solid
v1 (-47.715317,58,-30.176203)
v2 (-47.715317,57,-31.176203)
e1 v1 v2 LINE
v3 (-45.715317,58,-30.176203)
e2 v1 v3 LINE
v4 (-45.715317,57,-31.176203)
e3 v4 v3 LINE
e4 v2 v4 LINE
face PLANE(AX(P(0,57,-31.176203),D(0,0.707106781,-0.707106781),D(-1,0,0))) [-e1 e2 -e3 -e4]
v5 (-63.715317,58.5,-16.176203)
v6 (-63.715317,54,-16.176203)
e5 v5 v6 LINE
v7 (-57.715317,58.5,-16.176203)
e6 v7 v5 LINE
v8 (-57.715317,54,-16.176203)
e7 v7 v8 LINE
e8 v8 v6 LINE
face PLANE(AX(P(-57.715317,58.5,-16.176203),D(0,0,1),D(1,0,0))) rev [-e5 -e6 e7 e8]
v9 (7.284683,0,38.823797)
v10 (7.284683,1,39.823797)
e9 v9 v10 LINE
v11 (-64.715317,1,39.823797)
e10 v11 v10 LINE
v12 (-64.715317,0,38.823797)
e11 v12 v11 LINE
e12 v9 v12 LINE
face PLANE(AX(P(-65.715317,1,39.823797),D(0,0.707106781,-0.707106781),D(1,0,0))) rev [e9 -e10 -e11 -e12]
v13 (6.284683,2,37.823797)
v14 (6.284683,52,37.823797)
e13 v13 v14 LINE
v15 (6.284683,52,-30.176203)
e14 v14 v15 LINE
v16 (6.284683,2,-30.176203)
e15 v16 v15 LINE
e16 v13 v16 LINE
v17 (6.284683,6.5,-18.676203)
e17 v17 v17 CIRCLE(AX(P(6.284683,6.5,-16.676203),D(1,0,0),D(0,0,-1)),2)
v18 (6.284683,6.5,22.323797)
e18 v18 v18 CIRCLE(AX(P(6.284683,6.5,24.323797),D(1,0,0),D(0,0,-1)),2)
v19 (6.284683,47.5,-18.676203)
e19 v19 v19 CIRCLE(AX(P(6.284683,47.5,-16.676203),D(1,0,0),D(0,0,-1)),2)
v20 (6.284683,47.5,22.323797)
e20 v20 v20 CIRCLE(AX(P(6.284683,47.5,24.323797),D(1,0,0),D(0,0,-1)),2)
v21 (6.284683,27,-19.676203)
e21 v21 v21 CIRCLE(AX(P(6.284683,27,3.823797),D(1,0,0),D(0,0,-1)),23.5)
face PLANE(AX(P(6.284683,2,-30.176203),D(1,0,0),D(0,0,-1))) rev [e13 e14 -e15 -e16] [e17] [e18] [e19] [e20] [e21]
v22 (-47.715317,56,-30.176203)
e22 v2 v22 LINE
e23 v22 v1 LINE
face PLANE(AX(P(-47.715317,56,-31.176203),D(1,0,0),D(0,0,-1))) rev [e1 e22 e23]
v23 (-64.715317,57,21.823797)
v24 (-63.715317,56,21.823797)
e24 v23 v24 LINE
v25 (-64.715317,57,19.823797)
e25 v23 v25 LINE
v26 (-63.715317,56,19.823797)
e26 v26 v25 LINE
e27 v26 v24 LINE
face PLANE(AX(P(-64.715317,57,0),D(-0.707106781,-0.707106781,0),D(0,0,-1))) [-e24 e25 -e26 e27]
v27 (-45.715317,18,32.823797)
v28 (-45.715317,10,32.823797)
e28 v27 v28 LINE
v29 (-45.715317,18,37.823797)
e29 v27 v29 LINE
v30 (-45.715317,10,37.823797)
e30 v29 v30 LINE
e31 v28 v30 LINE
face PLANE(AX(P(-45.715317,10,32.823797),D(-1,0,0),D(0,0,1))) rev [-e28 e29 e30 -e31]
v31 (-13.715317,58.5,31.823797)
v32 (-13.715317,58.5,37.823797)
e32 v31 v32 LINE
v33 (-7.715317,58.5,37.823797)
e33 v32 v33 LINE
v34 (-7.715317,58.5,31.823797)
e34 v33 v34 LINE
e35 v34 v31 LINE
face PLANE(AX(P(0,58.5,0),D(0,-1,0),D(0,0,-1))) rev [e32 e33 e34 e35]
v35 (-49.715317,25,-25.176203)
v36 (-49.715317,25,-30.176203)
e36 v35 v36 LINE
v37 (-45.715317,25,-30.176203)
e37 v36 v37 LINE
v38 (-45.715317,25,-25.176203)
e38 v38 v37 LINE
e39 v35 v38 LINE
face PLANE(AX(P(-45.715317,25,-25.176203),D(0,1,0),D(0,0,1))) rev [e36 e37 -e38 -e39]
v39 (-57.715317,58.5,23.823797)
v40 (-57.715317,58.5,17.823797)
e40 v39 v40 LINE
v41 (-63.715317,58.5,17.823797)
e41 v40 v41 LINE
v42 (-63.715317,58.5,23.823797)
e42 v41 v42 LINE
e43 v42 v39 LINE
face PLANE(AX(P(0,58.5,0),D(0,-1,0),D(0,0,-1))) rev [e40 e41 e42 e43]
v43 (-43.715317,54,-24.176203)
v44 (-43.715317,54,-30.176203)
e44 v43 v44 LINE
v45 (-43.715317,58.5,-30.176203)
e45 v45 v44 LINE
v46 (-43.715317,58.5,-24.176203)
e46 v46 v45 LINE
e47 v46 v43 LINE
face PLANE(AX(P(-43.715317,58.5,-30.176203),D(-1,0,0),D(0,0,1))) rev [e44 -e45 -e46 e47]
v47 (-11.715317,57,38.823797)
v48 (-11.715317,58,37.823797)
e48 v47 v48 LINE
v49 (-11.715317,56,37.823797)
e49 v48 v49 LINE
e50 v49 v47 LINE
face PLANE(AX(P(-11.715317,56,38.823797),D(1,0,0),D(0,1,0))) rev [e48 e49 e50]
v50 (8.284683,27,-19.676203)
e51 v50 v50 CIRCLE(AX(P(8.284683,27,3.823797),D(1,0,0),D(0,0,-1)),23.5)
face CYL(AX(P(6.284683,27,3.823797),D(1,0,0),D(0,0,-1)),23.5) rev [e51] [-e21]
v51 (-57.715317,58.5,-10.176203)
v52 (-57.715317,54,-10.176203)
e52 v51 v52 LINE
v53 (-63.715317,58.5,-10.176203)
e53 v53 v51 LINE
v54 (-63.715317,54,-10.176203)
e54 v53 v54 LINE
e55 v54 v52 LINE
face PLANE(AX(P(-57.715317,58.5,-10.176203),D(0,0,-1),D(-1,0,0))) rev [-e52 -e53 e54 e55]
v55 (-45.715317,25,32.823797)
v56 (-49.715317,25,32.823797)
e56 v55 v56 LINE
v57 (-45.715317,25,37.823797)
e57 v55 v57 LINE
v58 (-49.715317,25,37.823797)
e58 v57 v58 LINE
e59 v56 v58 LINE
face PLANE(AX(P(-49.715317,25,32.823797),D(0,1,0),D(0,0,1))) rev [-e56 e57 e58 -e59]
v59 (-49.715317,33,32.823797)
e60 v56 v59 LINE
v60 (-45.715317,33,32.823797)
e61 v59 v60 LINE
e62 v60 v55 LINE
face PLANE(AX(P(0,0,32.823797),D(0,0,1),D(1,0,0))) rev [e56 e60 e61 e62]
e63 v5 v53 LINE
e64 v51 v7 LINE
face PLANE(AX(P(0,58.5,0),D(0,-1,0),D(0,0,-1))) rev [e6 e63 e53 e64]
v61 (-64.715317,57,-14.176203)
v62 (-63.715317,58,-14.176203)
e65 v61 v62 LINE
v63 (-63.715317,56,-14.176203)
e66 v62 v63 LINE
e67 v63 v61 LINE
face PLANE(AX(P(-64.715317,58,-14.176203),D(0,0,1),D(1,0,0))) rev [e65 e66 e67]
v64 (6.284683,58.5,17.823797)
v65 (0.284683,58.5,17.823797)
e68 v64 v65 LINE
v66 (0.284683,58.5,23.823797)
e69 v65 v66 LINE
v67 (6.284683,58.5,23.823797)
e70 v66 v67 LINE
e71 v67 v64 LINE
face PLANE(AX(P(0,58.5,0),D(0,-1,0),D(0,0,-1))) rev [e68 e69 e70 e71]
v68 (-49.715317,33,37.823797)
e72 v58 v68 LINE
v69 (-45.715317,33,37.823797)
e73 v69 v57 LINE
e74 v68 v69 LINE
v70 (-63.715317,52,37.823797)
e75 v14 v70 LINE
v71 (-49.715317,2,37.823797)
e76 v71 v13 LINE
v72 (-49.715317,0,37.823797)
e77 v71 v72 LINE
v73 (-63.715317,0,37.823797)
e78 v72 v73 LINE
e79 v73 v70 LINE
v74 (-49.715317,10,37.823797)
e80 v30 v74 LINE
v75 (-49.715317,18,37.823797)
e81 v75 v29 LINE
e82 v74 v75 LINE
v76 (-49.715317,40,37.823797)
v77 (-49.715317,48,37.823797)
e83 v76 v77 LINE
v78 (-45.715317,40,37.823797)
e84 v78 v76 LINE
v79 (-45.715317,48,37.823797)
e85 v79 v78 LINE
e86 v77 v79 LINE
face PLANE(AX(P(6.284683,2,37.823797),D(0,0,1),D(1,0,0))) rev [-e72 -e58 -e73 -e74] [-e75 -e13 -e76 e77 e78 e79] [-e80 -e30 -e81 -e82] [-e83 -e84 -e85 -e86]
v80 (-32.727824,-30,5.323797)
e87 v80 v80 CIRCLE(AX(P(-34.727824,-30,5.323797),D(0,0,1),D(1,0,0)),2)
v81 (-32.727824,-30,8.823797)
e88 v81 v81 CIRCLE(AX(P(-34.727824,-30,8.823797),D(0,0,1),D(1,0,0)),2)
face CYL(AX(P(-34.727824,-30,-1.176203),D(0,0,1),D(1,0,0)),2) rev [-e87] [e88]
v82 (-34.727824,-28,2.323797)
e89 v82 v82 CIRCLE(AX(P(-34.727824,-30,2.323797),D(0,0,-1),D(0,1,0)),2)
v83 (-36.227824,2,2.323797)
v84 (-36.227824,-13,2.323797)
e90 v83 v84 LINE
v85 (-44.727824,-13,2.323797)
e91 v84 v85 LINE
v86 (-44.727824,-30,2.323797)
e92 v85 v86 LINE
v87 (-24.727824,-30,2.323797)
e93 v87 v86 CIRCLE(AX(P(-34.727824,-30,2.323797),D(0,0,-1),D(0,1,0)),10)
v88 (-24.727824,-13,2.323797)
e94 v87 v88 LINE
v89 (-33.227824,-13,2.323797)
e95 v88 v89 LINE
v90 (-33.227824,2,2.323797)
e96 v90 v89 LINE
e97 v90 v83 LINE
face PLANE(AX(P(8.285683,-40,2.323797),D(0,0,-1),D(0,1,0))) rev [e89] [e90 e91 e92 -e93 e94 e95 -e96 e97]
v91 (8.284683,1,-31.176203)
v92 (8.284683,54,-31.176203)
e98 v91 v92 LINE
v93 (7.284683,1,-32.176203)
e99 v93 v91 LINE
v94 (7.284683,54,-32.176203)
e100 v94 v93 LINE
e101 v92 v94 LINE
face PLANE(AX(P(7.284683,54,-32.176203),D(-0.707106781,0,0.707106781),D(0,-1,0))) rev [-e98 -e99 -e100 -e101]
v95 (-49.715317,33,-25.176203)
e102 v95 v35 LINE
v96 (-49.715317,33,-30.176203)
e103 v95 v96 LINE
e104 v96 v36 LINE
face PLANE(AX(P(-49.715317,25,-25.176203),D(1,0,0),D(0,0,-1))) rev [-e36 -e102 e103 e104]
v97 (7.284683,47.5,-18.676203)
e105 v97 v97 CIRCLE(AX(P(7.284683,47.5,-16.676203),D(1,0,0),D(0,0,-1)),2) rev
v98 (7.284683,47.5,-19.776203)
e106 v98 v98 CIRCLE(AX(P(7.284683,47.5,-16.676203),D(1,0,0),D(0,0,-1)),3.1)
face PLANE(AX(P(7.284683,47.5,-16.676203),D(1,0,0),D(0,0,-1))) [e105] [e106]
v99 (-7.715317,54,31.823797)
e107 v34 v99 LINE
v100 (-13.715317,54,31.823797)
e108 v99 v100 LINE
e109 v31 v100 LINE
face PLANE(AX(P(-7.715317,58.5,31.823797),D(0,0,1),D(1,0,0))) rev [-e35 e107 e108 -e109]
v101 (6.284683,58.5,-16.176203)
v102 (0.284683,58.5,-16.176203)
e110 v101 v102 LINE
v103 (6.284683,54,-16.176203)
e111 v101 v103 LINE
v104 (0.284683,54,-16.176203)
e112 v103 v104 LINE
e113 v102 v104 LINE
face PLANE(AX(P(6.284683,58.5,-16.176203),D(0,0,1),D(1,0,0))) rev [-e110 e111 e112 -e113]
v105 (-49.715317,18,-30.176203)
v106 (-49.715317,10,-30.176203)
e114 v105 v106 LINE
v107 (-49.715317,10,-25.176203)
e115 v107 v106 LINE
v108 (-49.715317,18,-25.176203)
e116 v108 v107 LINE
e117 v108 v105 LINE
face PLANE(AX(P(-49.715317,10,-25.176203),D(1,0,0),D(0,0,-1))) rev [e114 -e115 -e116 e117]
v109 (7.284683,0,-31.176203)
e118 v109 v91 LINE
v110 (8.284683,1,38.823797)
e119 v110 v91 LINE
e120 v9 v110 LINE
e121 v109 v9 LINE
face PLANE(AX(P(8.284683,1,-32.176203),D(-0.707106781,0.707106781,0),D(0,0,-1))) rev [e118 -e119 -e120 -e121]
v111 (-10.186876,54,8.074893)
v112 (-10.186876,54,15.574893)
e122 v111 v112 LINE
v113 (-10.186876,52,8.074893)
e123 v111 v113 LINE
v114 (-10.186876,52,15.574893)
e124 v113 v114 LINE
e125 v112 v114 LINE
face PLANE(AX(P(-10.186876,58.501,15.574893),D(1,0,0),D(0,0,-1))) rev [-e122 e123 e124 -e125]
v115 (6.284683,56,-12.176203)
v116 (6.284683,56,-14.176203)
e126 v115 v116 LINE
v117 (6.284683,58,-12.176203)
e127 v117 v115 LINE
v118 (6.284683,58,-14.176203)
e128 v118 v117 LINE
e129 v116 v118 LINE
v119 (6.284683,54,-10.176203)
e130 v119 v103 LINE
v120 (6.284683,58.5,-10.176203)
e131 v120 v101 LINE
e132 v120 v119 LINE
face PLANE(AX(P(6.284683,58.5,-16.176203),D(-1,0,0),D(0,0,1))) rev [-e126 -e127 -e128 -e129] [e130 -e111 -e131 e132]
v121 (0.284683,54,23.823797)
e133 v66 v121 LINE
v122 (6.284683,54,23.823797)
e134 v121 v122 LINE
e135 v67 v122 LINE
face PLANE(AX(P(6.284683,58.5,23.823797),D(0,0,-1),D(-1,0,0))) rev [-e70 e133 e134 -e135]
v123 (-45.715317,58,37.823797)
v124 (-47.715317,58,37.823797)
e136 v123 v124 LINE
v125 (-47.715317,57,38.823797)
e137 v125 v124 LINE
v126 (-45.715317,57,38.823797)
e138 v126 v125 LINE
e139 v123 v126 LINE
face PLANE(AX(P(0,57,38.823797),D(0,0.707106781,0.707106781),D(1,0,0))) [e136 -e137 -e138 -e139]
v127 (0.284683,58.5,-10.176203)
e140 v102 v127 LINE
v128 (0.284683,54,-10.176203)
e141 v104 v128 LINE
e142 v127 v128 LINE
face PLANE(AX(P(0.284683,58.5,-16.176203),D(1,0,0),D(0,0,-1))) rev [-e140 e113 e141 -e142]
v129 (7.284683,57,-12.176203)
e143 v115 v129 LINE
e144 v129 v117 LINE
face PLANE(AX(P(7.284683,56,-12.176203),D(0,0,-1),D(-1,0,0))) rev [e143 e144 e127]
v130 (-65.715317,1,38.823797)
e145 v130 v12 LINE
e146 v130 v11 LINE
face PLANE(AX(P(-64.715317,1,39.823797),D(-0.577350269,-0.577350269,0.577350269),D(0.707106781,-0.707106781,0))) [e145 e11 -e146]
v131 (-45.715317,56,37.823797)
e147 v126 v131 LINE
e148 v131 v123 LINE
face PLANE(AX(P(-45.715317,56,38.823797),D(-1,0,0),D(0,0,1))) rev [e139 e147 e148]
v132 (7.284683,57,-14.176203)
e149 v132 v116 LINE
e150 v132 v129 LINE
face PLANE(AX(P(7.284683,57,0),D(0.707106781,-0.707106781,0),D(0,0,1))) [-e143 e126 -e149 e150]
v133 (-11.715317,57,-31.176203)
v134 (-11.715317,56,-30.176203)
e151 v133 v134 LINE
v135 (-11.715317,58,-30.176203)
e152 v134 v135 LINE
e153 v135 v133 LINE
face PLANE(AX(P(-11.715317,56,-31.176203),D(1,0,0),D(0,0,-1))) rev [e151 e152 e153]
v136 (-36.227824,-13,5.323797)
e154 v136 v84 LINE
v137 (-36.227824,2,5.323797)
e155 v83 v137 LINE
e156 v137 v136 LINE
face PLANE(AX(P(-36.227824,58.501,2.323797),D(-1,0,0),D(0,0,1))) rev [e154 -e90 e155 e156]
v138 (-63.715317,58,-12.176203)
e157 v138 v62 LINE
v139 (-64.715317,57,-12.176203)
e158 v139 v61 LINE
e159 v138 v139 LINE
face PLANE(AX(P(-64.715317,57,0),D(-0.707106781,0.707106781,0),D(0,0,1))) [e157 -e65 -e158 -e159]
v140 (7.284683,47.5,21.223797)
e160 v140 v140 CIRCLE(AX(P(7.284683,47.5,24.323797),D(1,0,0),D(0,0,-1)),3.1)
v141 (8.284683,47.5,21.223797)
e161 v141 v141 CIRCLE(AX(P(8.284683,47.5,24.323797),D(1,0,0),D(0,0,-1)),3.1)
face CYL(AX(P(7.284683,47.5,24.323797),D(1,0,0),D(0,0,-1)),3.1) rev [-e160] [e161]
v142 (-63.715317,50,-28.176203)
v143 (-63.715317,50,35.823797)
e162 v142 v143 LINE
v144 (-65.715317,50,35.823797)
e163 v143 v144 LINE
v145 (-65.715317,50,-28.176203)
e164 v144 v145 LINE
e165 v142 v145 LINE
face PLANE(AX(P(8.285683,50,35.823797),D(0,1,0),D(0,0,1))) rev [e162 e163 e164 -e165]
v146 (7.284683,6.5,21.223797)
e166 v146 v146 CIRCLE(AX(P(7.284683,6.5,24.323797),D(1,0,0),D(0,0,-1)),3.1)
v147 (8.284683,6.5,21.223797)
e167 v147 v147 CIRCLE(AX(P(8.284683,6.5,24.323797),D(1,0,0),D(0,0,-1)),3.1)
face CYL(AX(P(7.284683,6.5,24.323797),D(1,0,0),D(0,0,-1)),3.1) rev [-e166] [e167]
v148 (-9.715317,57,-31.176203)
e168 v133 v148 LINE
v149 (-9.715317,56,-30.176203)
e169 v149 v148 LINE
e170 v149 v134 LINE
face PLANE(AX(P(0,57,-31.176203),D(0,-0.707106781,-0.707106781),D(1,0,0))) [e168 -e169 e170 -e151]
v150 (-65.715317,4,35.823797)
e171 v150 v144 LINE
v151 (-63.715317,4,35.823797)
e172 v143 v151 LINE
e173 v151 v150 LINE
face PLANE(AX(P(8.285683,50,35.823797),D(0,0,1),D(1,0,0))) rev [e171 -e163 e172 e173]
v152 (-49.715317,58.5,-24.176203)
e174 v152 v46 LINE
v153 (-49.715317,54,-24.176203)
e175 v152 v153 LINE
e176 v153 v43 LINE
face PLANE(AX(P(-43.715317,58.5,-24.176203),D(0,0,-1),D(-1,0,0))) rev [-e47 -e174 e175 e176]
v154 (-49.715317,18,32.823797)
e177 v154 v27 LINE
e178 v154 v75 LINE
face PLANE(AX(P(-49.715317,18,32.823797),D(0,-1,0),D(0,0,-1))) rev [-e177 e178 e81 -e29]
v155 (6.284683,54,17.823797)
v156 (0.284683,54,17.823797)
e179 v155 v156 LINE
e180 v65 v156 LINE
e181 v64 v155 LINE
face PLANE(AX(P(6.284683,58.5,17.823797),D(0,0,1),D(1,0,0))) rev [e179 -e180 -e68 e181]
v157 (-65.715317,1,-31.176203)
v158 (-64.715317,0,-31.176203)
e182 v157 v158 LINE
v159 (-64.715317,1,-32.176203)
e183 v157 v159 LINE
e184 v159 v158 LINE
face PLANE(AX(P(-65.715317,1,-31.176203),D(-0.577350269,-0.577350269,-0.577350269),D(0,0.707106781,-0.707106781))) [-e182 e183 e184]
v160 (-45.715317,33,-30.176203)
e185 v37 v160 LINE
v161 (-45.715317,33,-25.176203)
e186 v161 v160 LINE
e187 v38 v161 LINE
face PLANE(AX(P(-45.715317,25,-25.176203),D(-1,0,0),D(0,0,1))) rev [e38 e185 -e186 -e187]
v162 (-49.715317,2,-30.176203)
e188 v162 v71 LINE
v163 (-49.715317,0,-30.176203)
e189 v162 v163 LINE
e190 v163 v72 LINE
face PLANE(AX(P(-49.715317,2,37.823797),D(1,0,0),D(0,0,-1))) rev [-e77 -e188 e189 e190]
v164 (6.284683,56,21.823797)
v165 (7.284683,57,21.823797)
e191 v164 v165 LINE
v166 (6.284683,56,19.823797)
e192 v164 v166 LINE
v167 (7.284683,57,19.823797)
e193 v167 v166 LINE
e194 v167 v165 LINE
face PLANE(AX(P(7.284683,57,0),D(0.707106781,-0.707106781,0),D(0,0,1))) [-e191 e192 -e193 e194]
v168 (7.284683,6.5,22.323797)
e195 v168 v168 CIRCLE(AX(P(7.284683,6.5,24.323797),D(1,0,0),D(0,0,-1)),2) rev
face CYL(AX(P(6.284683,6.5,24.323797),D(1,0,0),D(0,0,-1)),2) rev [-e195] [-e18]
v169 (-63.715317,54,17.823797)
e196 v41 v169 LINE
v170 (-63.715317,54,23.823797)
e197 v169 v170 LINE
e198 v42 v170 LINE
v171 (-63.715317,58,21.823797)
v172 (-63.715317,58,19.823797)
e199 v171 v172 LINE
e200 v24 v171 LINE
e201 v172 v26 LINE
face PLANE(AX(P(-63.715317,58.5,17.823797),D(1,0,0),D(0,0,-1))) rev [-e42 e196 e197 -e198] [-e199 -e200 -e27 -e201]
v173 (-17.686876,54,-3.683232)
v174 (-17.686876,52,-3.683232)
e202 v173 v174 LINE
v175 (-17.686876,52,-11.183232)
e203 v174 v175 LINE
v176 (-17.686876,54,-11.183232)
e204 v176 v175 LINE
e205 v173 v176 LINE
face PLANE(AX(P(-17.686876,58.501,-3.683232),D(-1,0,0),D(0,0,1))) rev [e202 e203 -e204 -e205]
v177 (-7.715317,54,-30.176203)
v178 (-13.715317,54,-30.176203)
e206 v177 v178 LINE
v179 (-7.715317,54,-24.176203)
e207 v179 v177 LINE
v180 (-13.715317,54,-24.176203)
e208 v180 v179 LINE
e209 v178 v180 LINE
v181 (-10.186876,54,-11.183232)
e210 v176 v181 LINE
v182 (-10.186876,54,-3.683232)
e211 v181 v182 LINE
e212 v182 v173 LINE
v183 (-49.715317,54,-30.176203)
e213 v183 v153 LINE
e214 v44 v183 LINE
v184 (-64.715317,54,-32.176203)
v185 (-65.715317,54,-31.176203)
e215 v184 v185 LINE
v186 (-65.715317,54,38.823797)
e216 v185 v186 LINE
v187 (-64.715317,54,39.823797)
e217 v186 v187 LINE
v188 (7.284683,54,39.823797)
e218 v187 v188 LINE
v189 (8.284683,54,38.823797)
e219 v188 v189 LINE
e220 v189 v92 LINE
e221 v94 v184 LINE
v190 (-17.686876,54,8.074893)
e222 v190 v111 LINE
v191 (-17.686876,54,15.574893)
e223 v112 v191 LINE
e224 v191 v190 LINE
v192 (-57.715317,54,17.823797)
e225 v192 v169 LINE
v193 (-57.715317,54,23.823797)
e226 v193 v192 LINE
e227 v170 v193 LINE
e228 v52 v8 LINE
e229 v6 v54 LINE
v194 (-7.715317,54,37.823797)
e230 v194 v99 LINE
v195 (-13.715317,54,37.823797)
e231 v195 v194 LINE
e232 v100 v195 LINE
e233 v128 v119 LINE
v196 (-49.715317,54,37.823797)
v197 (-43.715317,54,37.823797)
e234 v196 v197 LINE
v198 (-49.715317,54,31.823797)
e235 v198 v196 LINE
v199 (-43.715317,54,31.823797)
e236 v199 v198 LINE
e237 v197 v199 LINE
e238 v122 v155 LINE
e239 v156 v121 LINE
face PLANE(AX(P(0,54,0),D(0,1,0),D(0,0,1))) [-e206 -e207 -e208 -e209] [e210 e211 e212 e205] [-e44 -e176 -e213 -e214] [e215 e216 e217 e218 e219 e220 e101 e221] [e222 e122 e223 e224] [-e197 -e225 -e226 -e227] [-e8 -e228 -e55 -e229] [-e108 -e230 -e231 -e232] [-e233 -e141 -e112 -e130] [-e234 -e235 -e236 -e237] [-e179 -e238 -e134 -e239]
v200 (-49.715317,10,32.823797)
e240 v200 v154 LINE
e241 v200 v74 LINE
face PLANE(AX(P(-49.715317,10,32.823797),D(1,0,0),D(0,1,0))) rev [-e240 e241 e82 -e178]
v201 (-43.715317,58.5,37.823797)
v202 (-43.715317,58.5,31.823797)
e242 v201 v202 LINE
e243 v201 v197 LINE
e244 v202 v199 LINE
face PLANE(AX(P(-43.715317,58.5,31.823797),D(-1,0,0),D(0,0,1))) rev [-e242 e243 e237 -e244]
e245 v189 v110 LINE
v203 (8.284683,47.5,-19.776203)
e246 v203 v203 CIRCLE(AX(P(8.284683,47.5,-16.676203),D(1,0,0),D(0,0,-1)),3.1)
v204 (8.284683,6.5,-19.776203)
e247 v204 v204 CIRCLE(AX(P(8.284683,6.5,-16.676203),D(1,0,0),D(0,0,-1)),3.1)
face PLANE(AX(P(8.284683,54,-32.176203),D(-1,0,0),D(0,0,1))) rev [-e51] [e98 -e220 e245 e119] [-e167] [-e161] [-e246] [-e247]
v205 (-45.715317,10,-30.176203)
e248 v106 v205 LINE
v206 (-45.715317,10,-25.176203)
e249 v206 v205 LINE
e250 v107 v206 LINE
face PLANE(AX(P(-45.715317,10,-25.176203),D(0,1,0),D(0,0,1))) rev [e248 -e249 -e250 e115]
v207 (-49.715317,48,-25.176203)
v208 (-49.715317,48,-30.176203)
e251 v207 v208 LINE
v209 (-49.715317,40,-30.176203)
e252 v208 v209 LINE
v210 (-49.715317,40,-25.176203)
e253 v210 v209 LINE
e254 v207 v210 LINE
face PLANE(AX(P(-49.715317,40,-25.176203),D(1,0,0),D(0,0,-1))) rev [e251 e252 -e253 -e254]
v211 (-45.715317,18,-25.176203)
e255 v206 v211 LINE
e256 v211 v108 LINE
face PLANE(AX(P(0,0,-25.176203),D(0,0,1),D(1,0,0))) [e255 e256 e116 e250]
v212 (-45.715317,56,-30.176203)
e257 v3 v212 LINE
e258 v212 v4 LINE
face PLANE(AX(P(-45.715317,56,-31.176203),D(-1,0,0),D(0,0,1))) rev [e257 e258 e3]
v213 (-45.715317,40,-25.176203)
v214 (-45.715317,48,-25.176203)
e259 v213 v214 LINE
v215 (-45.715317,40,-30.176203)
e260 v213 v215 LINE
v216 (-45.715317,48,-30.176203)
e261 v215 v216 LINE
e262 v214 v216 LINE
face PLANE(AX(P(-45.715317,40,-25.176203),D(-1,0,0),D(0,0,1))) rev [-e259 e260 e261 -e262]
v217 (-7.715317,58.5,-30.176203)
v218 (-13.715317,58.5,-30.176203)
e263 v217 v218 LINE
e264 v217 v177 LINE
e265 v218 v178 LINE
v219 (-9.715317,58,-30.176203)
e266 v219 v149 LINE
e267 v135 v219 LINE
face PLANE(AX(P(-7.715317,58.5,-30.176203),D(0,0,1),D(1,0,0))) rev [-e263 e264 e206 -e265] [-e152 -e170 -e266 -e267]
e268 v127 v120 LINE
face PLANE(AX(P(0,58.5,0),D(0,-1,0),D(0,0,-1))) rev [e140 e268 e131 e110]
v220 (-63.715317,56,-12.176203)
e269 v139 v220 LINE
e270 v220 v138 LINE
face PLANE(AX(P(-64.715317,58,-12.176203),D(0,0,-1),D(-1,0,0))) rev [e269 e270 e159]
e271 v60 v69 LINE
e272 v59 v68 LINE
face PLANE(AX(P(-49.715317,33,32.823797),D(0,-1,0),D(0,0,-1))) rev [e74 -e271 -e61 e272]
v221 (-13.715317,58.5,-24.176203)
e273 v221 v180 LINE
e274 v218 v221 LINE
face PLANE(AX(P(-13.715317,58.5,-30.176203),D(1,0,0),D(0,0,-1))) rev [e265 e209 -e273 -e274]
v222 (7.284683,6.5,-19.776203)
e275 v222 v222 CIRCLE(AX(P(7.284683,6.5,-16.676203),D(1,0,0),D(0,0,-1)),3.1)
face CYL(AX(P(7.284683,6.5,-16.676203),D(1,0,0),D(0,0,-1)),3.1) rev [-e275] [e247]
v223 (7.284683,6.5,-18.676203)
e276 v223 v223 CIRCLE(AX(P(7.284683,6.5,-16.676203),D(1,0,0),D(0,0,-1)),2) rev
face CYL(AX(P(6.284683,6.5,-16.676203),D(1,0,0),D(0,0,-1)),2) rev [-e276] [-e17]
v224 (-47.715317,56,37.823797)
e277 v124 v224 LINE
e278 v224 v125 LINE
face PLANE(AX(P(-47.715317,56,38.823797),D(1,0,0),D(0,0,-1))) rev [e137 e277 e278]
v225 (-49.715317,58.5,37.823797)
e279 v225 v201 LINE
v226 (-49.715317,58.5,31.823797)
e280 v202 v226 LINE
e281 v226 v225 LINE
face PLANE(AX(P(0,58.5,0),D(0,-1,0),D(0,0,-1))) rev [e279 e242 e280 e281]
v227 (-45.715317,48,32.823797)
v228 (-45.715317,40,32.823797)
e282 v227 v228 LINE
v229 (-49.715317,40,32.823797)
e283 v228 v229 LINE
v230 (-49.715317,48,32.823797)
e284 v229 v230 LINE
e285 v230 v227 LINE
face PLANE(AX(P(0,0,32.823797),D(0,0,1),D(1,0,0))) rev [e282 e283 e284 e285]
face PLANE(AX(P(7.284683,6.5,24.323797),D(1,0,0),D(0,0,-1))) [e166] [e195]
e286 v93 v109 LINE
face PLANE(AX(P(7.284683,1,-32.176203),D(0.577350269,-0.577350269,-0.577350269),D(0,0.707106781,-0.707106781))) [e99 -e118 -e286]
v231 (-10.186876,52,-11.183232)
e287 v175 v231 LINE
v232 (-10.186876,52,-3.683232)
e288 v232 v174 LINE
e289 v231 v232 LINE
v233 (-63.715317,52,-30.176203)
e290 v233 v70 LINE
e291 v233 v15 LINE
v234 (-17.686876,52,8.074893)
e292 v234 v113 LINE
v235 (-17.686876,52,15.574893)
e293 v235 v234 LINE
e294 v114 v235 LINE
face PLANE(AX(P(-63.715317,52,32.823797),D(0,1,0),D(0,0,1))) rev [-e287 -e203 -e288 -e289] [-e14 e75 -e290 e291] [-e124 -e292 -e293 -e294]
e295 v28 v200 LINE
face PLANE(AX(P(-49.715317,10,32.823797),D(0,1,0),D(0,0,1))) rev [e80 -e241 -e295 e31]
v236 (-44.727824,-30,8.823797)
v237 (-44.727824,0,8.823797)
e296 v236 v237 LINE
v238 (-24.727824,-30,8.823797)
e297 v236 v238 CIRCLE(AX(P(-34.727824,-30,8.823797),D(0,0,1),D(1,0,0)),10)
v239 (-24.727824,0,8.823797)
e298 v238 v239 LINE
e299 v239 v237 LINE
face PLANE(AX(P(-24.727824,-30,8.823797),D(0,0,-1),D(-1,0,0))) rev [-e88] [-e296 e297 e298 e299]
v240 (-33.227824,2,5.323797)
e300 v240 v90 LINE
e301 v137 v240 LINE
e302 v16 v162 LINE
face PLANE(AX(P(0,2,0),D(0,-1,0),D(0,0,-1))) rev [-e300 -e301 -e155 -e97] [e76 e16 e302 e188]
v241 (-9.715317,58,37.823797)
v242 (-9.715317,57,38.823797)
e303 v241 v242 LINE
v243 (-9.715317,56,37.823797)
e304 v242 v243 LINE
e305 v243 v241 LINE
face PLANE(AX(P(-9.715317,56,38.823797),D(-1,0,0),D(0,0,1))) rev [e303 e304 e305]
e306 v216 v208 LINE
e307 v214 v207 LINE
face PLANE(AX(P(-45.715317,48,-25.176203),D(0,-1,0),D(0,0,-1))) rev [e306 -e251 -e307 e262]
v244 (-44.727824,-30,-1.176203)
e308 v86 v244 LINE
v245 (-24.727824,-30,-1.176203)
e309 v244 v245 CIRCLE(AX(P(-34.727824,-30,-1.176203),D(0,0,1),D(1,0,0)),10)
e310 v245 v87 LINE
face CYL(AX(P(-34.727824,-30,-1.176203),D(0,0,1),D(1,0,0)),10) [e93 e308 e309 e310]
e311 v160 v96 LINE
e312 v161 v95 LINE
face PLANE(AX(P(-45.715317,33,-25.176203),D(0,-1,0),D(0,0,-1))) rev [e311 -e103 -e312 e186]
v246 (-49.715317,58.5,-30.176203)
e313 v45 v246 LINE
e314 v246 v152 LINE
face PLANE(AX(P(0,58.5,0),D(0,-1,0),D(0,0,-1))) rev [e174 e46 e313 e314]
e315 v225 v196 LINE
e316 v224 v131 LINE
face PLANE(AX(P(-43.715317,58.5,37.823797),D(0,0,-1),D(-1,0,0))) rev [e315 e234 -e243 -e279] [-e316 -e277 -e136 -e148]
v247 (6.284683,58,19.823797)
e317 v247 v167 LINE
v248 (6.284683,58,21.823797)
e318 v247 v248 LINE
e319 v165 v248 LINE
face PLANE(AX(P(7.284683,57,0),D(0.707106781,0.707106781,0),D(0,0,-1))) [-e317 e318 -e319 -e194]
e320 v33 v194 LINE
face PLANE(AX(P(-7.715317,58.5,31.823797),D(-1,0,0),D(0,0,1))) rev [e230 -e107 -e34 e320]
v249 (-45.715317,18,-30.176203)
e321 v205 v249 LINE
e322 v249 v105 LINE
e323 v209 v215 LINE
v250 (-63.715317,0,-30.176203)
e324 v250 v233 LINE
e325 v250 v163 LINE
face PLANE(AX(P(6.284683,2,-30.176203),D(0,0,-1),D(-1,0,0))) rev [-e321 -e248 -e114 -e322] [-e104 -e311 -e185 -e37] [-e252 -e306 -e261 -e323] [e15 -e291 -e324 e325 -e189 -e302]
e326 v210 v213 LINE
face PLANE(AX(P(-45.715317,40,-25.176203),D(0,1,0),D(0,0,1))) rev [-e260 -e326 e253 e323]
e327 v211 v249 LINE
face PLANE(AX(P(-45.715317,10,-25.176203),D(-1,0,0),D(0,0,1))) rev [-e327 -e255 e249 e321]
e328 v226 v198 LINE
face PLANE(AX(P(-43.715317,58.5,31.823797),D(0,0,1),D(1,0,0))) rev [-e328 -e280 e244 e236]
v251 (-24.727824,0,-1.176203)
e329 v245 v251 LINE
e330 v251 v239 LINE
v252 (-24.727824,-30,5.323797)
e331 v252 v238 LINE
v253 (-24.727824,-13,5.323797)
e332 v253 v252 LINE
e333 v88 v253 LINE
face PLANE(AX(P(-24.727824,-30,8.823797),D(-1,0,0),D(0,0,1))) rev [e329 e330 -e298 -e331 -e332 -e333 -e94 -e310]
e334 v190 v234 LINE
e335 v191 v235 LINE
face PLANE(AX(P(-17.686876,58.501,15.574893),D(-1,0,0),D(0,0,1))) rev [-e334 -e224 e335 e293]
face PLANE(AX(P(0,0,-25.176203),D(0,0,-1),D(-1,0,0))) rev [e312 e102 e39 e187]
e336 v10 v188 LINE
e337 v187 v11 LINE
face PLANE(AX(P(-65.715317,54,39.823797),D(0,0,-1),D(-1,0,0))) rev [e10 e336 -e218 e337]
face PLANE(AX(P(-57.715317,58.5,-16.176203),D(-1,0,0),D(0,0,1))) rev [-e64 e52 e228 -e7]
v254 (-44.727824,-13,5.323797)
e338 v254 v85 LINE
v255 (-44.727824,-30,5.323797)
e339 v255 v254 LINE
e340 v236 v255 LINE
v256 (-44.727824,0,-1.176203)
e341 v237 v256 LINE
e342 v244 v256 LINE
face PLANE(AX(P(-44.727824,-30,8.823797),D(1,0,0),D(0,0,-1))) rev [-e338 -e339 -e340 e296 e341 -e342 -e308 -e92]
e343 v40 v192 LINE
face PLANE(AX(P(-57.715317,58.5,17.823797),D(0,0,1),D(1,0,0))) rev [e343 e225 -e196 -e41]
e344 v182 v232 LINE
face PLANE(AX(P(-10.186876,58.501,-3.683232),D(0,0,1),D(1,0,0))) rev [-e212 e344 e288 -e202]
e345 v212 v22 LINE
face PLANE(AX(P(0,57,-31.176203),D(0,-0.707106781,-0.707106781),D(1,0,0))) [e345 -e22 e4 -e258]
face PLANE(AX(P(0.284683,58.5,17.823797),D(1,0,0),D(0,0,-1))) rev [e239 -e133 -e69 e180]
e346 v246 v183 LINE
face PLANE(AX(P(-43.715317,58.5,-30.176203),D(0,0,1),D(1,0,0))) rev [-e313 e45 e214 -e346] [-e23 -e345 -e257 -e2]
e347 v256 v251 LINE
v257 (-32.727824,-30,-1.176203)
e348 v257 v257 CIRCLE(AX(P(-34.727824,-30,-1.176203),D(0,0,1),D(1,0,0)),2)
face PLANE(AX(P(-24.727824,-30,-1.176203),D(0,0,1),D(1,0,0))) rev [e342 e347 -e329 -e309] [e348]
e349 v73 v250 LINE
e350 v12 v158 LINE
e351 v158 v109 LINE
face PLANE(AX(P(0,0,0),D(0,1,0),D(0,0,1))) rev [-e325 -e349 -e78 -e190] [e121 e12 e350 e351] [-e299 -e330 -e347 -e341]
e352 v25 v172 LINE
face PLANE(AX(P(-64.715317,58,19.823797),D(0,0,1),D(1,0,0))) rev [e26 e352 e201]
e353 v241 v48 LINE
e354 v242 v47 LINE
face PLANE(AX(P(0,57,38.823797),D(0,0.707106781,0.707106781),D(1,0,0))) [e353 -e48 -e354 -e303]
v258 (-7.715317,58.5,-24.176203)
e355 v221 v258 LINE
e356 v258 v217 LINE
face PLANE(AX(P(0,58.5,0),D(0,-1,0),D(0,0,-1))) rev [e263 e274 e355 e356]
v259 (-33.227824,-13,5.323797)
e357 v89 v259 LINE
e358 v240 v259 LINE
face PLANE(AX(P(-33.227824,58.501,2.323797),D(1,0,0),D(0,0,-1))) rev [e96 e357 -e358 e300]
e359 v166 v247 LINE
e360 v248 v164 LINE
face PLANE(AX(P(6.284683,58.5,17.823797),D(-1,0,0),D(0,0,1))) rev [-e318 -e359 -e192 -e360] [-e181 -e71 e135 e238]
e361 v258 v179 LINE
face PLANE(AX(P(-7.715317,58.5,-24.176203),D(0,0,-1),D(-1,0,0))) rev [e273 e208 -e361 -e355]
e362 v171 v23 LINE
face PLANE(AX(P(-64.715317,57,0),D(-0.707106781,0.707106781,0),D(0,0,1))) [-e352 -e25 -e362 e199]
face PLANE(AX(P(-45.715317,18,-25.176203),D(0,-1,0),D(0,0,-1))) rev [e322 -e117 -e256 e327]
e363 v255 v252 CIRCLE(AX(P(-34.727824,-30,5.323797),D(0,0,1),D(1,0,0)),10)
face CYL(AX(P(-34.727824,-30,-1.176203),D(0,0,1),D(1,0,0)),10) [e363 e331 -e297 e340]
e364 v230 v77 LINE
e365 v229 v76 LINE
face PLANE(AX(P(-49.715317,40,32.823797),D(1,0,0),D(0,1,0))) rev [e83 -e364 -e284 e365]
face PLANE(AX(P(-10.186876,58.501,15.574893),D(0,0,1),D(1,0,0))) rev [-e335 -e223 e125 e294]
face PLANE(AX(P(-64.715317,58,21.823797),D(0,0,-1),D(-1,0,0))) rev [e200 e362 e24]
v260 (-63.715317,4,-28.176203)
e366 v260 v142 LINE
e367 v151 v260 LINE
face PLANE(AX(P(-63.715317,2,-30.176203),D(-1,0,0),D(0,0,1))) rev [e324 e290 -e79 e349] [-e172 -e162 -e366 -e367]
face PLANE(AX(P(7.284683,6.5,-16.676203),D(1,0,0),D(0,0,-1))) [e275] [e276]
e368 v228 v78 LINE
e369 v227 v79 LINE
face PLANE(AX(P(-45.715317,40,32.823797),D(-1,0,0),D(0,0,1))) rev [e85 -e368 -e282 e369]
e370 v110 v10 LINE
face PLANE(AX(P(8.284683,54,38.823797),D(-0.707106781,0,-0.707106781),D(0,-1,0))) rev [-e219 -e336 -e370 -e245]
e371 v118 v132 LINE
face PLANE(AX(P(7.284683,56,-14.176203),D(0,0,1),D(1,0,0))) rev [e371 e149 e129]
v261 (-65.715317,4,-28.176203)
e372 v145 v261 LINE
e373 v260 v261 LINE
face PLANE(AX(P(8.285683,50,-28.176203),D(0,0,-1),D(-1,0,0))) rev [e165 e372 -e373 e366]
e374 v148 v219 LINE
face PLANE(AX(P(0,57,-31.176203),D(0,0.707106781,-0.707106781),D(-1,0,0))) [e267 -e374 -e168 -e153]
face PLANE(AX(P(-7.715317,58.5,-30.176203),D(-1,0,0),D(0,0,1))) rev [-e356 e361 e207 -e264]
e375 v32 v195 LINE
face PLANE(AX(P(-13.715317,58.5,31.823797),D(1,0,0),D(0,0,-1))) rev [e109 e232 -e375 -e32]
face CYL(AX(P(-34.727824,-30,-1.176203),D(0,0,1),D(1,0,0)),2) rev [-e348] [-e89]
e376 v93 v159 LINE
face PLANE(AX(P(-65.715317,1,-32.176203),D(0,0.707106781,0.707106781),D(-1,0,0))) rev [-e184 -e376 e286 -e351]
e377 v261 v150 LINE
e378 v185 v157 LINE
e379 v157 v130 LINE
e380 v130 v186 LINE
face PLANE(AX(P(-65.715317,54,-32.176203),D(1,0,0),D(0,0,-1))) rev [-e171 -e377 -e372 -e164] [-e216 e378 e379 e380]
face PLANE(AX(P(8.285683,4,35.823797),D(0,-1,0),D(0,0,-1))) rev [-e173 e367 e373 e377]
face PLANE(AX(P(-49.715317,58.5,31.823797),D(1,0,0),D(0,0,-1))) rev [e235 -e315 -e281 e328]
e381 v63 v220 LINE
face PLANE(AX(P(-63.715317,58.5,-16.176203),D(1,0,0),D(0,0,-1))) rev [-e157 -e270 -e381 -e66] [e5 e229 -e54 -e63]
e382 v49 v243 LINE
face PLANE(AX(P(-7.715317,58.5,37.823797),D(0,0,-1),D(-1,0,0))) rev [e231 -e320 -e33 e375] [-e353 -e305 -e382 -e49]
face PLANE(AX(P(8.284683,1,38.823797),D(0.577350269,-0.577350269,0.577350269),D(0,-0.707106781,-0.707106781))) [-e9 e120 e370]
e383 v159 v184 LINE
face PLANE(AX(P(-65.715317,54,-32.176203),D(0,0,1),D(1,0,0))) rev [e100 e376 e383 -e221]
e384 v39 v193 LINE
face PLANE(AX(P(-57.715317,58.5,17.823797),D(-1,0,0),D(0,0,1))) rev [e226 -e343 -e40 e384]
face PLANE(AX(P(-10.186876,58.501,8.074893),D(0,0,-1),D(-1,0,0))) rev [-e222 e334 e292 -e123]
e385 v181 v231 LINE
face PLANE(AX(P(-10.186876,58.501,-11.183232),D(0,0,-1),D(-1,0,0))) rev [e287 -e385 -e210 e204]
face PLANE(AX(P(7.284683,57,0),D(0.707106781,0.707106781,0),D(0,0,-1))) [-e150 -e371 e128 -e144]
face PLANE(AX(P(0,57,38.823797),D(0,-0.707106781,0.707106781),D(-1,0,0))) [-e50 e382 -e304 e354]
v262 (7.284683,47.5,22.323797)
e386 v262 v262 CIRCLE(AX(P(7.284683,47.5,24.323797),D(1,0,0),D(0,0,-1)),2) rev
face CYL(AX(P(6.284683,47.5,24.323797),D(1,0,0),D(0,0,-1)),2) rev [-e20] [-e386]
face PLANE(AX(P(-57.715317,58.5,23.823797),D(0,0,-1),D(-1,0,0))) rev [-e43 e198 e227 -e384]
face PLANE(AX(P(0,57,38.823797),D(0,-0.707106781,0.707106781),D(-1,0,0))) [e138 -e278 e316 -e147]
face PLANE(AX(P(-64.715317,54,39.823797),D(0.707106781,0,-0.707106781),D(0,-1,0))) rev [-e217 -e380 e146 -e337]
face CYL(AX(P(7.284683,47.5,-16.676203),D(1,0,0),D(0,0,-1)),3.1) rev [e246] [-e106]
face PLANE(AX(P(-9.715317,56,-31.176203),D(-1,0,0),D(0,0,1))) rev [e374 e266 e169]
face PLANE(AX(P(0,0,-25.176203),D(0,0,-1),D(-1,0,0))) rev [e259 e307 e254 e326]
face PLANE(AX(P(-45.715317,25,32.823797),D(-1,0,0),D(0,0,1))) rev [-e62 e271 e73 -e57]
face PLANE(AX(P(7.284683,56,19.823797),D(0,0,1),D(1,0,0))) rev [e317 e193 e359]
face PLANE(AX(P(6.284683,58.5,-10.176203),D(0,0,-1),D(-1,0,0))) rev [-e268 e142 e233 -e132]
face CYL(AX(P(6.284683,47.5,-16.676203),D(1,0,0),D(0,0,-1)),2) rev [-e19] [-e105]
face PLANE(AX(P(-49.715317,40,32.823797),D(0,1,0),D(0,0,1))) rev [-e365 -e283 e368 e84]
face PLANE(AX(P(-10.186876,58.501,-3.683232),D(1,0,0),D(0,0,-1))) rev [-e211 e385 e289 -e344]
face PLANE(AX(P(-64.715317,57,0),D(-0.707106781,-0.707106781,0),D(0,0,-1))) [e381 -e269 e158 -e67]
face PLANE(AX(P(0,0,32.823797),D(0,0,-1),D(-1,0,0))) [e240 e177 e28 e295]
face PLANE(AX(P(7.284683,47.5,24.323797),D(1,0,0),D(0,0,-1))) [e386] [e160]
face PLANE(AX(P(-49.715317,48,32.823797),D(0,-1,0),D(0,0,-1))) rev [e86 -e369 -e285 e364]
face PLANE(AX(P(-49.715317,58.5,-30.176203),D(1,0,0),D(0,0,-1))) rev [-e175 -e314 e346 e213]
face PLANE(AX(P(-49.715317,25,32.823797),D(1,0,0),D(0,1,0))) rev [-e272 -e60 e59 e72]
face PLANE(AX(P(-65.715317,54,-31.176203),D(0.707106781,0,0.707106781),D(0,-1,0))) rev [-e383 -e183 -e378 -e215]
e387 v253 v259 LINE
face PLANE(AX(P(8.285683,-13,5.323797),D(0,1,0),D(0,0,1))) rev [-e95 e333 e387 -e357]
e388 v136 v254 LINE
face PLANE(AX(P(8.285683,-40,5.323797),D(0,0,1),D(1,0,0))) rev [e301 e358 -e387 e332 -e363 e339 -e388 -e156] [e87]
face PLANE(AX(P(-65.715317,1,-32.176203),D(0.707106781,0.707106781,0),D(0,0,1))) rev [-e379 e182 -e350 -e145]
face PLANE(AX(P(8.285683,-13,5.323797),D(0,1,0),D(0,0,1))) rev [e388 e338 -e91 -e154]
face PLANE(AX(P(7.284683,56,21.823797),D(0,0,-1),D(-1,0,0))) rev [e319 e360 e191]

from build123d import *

# Parameters (mm, degrees)
SKETCH_1_W          = 74
SKETCH_1_H          = 72
EXTRUDE_1_DEPTH     = 54
SKETCH_2_W          = 70
SKETCH_2_H          = 68
CUT_EXTRUDE_1_DEPTH = 52
SKETCH_4_R          = 23.5
SKETCH_4_R_2        = 2
CUT_EXTRUDE_2_DEPTH = 2
SKETCH_5_W          = 14
SKETCH_5_H          = 68
CUT_EXTRUDE_3_DEPTH = 2
SKETCH_6_W          = 9
SKETCH_6_H          = 2
EXTRUDE_2_DEPTH     = 5
SKETCH_7_W          = 9
SKETCH_7_H          = 2
EXTRUDE_3_DEPTH     = 5
CUT_EXTRUDE_4_REACH = 101.89
SKETCH_9_W          = 64
SKETCH_9_H          = 46
SKETCH_10_W         = 4
SKETCH_10_H         = 8
EXTRUDE_5_DEPTH     = 5
SKETCH_11_W         = 4
SKETCH_11_H         = 8
EXTRUDE_6_DEPTH     = 5
SKETCH_15_W         = 70
SKETCH_15_H         = 68
EXTRUDE_7_DEPTH     = 2
SKETCH_16_W         = 6
SKETCH_16_H         = 6
EXTRUDE_8_DEPTH     = 4.5
SKETCH_17_W         = 2
SKETCH_17_H         = 2
EXTRUDE_9_DEPTH     = 1
SKETCH_18_W         = 2
SKETCH_18_H         = 2
EXTRUDE_10_DEPTH    = 1
SKETCH_19_W         = 2
SKETCH_19_H         = 2
EXTRUDE_11_DEPTH    = 1
SKETCH_20_W         = 2
SKETCH_20_H         = 2
EXTRUDE_12_DEPTH    = 1
CUT_EXTRUDE_5_REACH = 94.782
SKETCH_21_W         = 7.5
SKETCH_21_H         = 7.5
SKETCH_25_W         = 20
SKETCH_25_H         = 10
EXTRUDE_15_DEPTH    = 30
SKETCH_26_R         = 10
EXTRUDE_16_DEPTH    = 10
SKETCH_27_R         = 2
CUT_EXTRUDE_6_DEPTH = 10
CUT_EXTRUDE_7_REACH = 90.422
SKETCH_29_W         = 3
SKETCH_29_H         = 27
CUT_EXTRUDE_8_REACH = 106.96
SKETCH_30_W         = 3
SKETCH_30_H         = 3
CHAMFER_1_SIZE      = 1
CHAMFER_2_SIZE      = 1
SKETCH_31_R         = 3.1
CUT_EXTRUDE_9_DEPTH = 1
CHAMFER_3_SIZE      = 1


with BuildPart() as part:
    # 草图1 → 凸台-拉伸1 (new body)
    with BuildSketch(Plane(origin=(0, 0, 0), x_dir=(1, 0, 0), z_dir=(0, 1, 0))):
        with Locations((-28.715316709, -3.823796856)):
            Rectangle(SKETCH_1_W, SKETCH_1_H)
    extrude(amount=EXTRUDE_1_DEPTH)

    # 草图2 → 切除-拉伸1 (cut)
    with BuildSketch(Plane(origin=(0, 54, 0), x_dir=(1, 0, 0), z_dir=(0, 1, 0))):
        with Locations((-28.715316709, -3.823796856)):
            Rectangle(SKETCH_2_W, SKETCH_2_H)
    extrude(amount=-CUT_EXTRUDE_1_DEPTH, mode=Mode.SUBTRACT)

    # 草图4 → 切除-拉伸2 (cut)
    with BuildSketch(Plane(origin=(8.284683291, 0, 0), x_dir=(0, 0, -1), z_dir=(1, 0, 0))):
        with Locations((-3.823796856, 27)):
            Circle(SKETCH_4_R)
        with Locations((16.676203144, 6.5)):
            Circle(SKETCH_4_R_2)
        with Locations((-24.323796856, 47.5)):
            Circle(SKETCH_4_R_2)
        with Locations((-24.323796856, 6.5)):
            Circle(SKETCH_4_R_2)
        with Locations((16.676203144, 47.5)):
            Circle(SKETCH_4_R_2)
    extrude(amount=-CUT_EXTRUDE_2_DEPTH, mode=Mode.SUBTRACT)

    # 草图5 → 切除-拉伸3 (cut)
    with BuildSketch(Plane.XZ):
        with Locations((-56.715316709, 3.823796856)):
            Rectangle(SKETCH_5_W, SKETCH_5_H)
    extrude(amount=-CUT_EXTRUDE_3_DEPTH, mode=Mode.SUBTRACT)

    # 草图6 → 凸台-拉伸2 (add)
    with BuildSketch(Plane(origin=(0, 0, 37.823796856), x_dir=(-1, 0, 0), z_dir=(0, 0, -1))):
        with Locations((59.215316709, 53)):
            Rectangle(SKETCH_6_W, SKETCH_6_H)
    extrude(amount=EXTRUDE_2_DEPTH)

    # 草图7 → 凸台-拉伸3 (add)
    with BuildSketch(Plane.XY.offset(-30.176203144)):
        with Locations((-59.215316709, 53)):
            Rectangle(SKETCH_7_W, SKETCH_7_H)
    extrude(amount=EXTRUDE_3_DEPTH)

    # 草图9 → 切除-拉伸4 (cut, up to next)
    with BuildSketch(Plane.ZY.offset(65.715316709), mode=Mode.PRIVATE) as cut_extrude_4_sk1:
        with Locations((3.823796856, 27)):
            Rectangle(SKETCH_9_W, SKETCH_9_H)
    cut_extrude_4_tool1 = extrude(cut_extrude_4_sk1.sketch, amount=-CUT_EXTRUDE_4_REACH, mode=Mode.PRIVATE) & part.part
    add(cut_extrude_4_tool1.solids().sort_by_distance((-65.715317, 27, 3.823797))[0], mode=Mode.SUBTRACT)

    # 草图10 → 凸台-拉伸5 (add)
    with BuildSketch(Plane(origin=(0, 0, 37.823796856), x_dir=(-1, 0, 0), z_dir=(0, 0, -1))):
        with Locations((47.715316709, 14)):
            Rectangle(SKETCH_10_W, SKETCH_10_H)
        with Locations((47.715316709, 29)):
            Rectangle(SKETCH_10_W, SKETCH_10_H)
        with Locations((47.715316709, 44)):
            Rectangle(SKETCH_10_W, SKETCH_10_H)
    extrude(amount=EXTRUDE_5_DEPTH)

    # 草图11 → 凸台-拉伸6 (add)
    with BuildSketch(Plane.XY.offset(-30.176203144)):
        with Locations((-47.715316709, 14)):
            Rectangle(SKETCH_11_W, SKETCH_11_H)
        with Locations((-47.715316709, 29)):
            Rectangle(SKETCH_11_W, SKETCH_11_H)
        with Locations((-47.715316709, 44)):
            Rectangle(SKETCH_11_W, SKETCH_11_H)
    extrude(amount=EXTRUDE_6_DEPTH)

    # 草图15 → 凸台-拉伸7 (add)
    with BuildSketch(Plane(origin=(0, 54, 0), x_dir=(1, 0, 0), z_dir=(0, 1, 0))):
        with Locations((-28.715316709, -3.823796856)):
            Rectangle(SKETCH_15_W, SKETCH_15_H)
    extrude(amount=-EXTRUDE_7_DEPTH)

    # 草图16 → 凸台-拉伸8 (add)
    with BuildSketch(Plane(origin=(0, 54, 0), x_dir=(1, 0, 0), z_dir=(0, 1, 0))):
        with Locations((-46.715316709, -34.823796856)):
            Rectangle(SKETCH_16_W, SKETCH_16_H)
        with Locations((-60.715316709, 13.176203144)):
            Rectangle(SKETCH_16_W, SKETCH_16_H)
        with Locations((-10.715316709, -34.823796856)):
            Rectangle(SKETCH_16_W, SKETCH_16_H)
        with Locations((-46.715316709, 27.176203144)):
            Rectangle(SKETCH_16_W, SKETCH_16_H)
        with Locations((-10.715316709, 27.176203144)):
            Rectangle(SKETCH_16_W, SKETCH_16_H)
        with Locations((3.284683291, 13.176203144)):
            Rectangle(SKETCH_16_W, SKETCH_16_H)
        with Locations((3.284683291, -20.823796856)):
            Rectangle(SKETCH_16_W, SKETCH_16_H)
        with Locations((-60.715316709, -20.823796856)):
            Rectangle(SKETCH_16_W, SKETCH_16_H)
    extrude(amount=EXTRUDE_8_DEPTH)

    # 草图17 → 凸台-拉伸9 (add)
    with BuildSketch(Plane.ZY.offset(63.715316709)):
        with Locations((-13.176203144, 57)):
            Rectangle(SKETCH_17_W, SKETCH_17_H)
        with Locations((20.823796856, 57)):
            Rectangle(SKETCH_17_W, SKETCH_17_H)
    extrude(amount=EXTRUDE_9_DEPTH)

    # 草图18 → 凸台-拉伸10 (add)
    with BuildSketch(Plane.XY.offset(37.823796856)):
        with Locations((-10.715316709, 57)):
            Rectangle(SKETCH_18_W, SKETCH_18_H)
        with Locations((-46.715316709, 57)):
            Rectangle(SKETCH_18_W, SKETCH_18_H)
    extrude(amount=EXTRUDE_10_DEPTH)

    # 草图19 → 凸台-拉伸11 (add)
    with BuildSketch(Plane(origin=(6.284683291, 0, 0), x_dir=(0, 0, -1), z_dir=(1, 0, 0))):
        with Locations((13.176203144, 57)):
            Rectangle(SKETCH_19_W, SKETCH_19_H)
        with Locations((-20.823796856, 57)):
            Rectangle(SKETCH_19_W, SKETCH_19_H)
    extrude(amount=EXTRUDE_11_DEPTH)

    # 草图20 → 凸台-拉伸12 (add)
    with BuildSketch(Plane(origin=(0, 0, -30.176203144), x_dir=(-1, 0, 0), z_dir=(0, 0, -1))):
        with Locations((46.715316709, 57)):
            Rectangle(SKETCH_20_W, SKETCH_20_H)
        with Locations((10.715316709, 57)):
            Rectangle(SKETCH_20_W, SKETCH_20_H)
    extrude(amount=EXTRUDE_12_DEPTH)

    # 草图21 → 切除-拉伸5 (cut, up to next)
    with BuildSketch(Plane(origin=(0, 52, 0), x_dir=(-1, 0, 0), z_dir=(0, -1, 0)), mode=Mode.PRIVATE) as cut_extrude_5_sk1:
        with Locations((13.936875607, -11.824892758)):
            Rectangle(SKETCH_21_W, SKETCH_21_H)
    cut_extrude_5_tool1 = extrude(cut_extrude_5_sk1.sketch, amount=-CUT_EXTRUDE_5_REACH, mode=Mode.PRIVATE) & part.part
    # 草图21 → 切除-拉伸5 (cut, up to next)
    with BuildSketch(Plane(origin=(0, 52, 0), x_dir=(-1, 0, 0), z_dir=(0, -1, 0)), mode=Mode.PRIVATE) as cut_extrude_5_sk2:
        with Locations((13.936875607, 7.433232356)):
            Rectangle(SKETCH_21_W, SKETCH_21_H)
    cut_extrude_5_tool2 = extrude(cut_extrude_5_sk2.sketch, amount=-CUT_EXTRUDE_5_REACH, mode=Mode.PRIVATE) & part.part
    add(cut_extrude_5_tool1.solids().sort_by_distance((-13.936876, 52, 11.824893))[0], mode=Mode.SUBTRACT)
    add(cut_extrude_5_tool2.solids().sort_by_distance((-13.936876, 52, -7.433232))[0], mode=Mode.SUBTRACT)

    # 草图25 → 凸台-拉伸15 (add)
    with BuildSketch(Plane.XZ):
        with Locations((-34.727823945, 3.823796856)):
            Rectangle(SKETCH_25_W, SKETCH_25_H)
    extrude(amount=EXTRUDE_15_DEPTH)

    # 草图26 → 凸台-拉伸16 (add)
    with BuildSketch(Plane.XY.offset(8.823796856)):
        with Locations((-34.727823945, -30)):
            Circle(SKETCH_26_R)
    extrude(amount=-EXTRUDE_16_DEPTH)

    # 草图27 → 切除-拉伸6 (cut)
    with BuildSketch(Plane.XY.offset(8.823796856)):
        with Locations((-34.727823945, -30)):
            Circle(SKETCH_27_R)
    extrude(amount=-CUT_EXTRUDE_6_DEPTH, mode=Mode.SUBTRACT)

    # 草图29 → 切除-拉伸7 (cut, up to next)
    with BuildSketch(Plane.ZY.offset(44.727823945), mode=Mode.PRIVATE) as cut_extrude_7_sk1:
        with Locations((3.823796856, -26.5)):
            Rectangle(SKETCH_29_W, SKETCH_29_H)
    cut_extrude_7_tool1 = extrude(cut_extrude_7_sk1.sketch, amount=-CUT_EXTRUDE_7_REACH, mode=Mode.PRIVATE) & part.part
    add(cut_extrude_7_tool1.solids().sort_by_distance((-44.727824, -26.5, 3.823797))[0], mode=Mode.SUBTRACT)

    # 草图30 → 切除-拉伸8 (cut, up to next)
    with BuildSketch(Plane.XZ.offset(13), mode=Mode.PRIVATE) as cut_extrude_8_sk1:
        with Locations((-34.727823945, 3.823796856)):
            Rectangle(SKETCH_30_W, SKETCH_30_H)
    cut_extrude_8_tool1 = extrude(cut_extrude_8_sk1.sketch, amount=-CUT_EXTRUDE_8_REACH, mode=Mode.PRIVATE) & part.part
    add(cut_extrude_8_tool1.solids().sort_by_distance((-34.727824, -13, 3.823797))[0], mode=Mode.SUBTRACT)

    # 倒角1
    chamfer_1_edges = [part.edges().sort_by_distance(p)[0] for p in [
        (-28.715316709, 0, -32.176203144),
        (8.284683291, 0, 3.823796856),
        (-28.715316709, 0, 39.823796856),
        (-65.715316709, 0, 3.823796856),
        (-65.715316709, 27, -32.176203144),
        (8.284683291, 27, -32.176203144),
        (8.284683291, 27, 39.823796856),
        (-65.715316709, 27, 39.823796856),
    ]]
    chamfer(chamfer_1_edges, length=CHAMFER_1_SIZE)

    # 倒角2
    chamfer_2_edges = [part.edges().sort_by_distance(p)[0] for p in [
        (7.284683291, 58, 20.823796856),
        (7.284683291, 58, -13.176203144),
        (-10.715316709, 58, -31.176203144),
        (-46.715316709, 58, -31.176203144),
        (-64.715316709, 58, -13.176203144),
        (-64.715316709, 58, 20.823796856),
        (-10.715316709, 58, 38.823796856),
        (-46.715316709, 58, 38.823796856),
    ]]
    chamfer(chamfer_2_edges, length=CHAMFER_2_SIZE - 0.0001)  # a hair under: the kernel refuses the full size

    # 草图31 → 切除-拉伸9 (cut)
    with BuildSketch(Plane(origin=(8.284683291, 0, 0), x_dir=(0, 0, -1), z_dir=(1, 0, 0))):
        with Locations((16.676203144, 6.5)):
            Circle(SKETCH_31_R)
        with Locations((-24.323796856, 6.5)):
            Circle(SKETCH_31_R)
        with Locations((-24.323796856, 47.5)):
            Circle(SKETCH_31_R)
        with Locations((16.676203144, 47.5)):
            Circle(SKETCH_31_R)
    extrude(amount=-CUT_EXTRUDE_9_DEPTH, mode=Mode.SUBTRACT)

    # 倒角3
    chamfer_3_edges = [part.edges().sort_by_distance(p)[0] for p in [
        (-64.715316709, 56, 20.823796856),
        (-64.715316709, 56, -13.176203144),
        (-46.715316709, 56, -31.176203144),
        (-10.715316709, 56, -31.176203144),
        (7.284683291, 56, -13.176203144),
        (7.284683291, 56, 20.823796856),
        (-46.715316709, 56, 38.823796856),
        (-10.715316709, 56, 38.823796856),
    ]]
    chamfer(chamfer_3_edges, length=CHAMFER_3_SIZE - 0.0001)  # a hair under: the kernel refuses the full size


solid = part.part
